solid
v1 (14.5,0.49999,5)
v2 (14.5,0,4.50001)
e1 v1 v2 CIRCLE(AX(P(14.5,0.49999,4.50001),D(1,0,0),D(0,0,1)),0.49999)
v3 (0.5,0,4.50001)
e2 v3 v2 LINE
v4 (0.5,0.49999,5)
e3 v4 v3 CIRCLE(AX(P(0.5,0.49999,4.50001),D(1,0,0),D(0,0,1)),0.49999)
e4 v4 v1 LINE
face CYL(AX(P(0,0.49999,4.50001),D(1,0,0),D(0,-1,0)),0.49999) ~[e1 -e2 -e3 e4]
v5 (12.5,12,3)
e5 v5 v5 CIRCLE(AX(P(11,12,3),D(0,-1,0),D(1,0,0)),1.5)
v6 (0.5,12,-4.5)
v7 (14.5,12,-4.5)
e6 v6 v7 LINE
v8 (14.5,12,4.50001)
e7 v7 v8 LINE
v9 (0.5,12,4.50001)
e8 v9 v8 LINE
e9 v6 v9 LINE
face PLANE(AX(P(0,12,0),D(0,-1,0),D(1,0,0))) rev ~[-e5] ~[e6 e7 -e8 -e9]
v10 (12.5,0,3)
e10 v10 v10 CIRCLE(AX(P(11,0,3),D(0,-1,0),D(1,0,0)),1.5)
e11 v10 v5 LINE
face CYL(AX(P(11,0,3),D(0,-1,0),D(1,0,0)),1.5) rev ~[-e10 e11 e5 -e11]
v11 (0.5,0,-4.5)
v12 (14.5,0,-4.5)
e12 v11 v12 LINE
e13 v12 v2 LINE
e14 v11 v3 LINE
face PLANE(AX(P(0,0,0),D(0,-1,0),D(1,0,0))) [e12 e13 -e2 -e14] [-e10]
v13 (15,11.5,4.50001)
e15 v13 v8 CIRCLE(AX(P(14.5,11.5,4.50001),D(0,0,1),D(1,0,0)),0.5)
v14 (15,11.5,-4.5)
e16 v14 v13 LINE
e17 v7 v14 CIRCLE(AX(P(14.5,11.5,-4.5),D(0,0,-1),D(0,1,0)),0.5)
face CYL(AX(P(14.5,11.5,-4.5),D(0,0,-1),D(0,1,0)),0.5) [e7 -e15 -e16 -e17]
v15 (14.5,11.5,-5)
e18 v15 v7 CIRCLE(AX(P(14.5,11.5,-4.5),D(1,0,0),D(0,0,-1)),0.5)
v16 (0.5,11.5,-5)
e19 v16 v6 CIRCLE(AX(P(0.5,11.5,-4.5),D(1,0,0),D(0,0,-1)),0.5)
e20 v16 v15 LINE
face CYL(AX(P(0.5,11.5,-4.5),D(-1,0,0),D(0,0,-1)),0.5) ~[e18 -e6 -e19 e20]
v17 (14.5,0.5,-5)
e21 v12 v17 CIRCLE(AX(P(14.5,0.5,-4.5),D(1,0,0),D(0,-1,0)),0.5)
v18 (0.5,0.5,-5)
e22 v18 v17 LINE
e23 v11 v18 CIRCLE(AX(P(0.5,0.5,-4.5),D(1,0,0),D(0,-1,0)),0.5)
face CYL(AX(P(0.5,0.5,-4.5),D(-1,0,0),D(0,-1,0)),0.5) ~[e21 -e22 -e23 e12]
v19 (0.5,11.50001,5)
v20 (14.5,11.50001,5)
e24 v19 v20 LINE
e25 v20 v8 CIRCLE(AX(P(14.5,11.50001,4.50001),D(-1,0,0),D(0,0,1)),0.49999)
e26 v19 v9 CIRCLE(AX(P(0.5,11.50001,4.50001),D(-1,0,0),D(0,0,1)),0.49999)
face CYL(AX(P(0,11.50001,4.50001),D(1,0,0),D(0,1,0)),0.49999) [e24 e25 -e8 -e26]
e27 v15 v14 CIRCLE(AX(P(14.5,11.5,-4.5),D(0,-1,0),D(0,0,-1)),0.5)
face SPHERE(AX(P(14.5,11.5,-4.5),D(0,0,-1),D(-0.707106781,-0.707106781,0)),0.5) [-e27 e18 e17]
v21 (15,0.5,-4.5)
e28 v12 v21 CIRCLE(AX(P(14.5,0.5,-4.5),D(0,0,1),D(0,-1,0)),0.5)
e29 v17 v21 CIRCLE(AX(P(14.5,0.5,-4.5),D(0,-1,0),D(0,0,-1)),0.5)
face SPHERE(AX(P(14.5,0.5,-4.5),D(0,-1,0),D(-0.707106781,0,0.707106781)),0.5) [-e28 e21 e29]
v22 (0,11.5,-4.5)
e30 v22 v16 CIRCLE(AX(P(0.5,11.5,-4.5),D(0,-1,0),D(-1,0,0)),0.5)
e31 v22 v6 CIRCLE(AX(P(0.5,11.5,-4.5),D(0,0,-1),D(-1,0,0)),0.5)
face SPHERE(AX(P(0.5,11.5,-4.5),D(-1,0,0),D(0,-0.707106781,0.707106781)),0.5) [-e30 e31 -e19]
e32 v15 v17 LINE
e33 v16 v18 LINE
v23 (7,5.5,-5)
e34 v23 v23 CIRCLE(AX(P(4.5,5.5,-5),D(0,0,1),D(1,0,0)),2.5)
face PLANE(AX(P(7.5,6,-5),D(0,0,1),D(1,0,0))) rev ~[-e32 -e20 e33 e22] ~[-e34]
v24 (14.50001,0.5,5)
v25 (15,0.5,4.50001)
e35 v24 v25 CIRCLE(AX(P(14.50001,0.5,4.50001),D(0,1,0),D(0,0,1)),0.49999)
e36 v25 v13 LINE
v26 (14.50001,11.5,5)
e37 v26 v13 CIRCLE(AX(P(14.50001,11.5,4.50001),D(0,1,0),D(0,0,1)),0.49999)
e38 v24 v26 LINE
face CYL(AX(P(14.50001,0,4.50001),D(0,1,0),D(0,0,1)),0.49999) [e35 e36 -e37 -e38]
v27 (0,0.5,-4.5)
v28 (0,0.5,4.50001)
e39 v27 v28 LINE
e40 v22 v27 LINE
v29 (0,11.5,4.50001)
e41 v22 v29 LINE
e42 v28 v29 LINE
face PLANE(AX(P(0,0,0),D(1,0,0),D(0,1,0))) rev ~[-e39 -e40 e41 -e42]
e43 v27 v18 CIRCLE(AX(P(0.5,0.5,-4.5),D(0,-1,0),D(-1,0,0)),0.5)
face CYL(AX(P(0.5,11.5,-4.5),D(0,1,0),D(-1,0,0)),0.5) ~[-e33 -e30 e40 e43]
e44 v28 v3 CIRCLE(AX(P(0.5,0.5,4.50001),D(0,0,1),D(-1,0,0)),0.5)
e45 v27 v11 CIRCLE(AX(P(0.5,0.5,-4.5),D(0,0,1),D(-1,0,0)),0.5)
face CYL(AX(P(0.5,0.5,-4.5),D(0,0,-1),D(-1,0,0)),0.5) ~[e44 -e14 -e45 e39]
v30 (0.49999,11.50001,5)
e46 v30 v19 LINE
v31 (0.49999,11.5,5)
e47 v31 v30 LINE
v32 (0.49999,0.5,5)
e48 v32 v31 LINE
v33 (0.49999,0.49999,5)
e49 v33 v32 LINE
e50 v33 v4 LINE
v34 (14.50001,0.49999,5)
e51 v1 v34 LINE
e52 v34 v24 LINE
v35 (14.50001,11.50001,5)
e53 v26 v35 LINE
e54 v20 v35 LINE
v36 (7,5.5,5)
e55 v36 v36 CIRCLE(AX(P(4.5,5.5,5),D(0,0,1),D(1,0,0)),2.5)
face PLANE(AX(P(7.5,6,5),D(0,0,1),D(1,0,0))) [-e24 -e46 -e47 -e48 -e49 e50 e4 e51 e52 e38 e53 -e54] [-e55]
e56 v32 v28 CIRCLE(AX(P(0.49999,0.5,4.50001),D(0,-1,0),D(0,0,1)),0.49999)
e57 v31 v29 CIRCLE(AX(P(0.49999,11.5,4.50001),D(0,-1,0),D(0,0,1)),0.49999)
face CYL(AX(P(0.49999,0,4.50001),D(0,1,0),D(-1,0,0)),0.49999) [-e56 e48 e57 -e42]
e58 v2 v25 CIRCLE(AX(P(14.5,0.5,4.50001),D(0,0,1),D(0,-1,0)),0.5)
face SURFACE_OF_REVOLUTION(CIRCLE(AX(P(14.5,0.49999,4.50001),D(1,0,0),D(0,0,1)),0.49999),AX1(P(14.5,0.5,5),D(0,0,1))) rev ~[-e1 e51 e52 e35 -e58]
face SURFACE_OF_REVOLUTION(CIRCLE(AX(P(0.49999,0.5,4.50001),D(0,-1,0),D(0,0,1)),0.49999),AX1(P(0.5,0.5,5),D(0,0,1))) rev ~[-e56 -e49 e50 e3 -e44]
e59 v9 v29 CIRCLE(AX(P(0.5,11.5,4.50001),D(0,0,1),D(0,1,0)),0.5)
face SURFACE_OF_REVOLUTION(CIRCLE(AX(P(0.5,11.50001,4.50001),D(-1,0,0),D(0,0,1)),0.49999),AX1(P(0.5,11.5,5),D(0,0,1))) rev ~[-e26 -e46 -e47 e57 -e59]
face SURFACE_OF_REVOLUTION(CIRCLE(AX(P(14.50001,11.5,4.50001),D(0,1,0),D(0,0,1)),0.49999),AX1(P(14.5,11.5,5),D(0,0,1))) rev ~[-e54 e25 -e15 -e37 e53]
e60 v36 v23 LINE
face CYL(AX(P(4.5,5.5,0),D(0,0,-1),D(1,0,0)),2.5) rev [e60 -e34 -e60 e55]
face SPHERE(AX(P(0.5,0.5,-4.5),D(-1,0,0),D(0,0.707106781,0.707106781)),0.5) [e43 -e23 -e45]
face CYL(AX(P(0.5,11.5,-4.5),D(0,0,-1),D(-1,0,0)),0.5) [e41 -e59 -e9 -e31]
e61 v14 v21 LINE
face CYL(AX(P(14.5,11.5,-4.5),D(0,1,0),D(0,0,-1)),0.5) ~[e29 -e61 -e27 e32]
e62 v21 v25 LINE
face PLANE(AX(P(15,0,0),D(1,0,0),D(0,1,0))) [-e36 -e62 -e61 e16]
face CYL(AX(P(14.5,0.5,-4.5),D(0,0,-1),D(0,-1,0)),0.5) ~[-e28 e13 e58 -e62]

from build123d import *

# Parameters (mm, degrees)
F0_W         = 15
F0_H         = 12
F0_R         = 2.5
F1_DEPTH     = 5
F2_R         = 1.5
F3_DEPTH     = 12.001
F4_R         = 0.49999
F5_T1_DEPTH  = 9.5
F5_T3_DEPTH  = 11
F5_T5_DEPTH  = 14
F5_T8_ANGLE  = 90
F5_T10_ANGLE = 90
F5_T12_ANGLE = 90
F5_T14_ANGLE = 90
F5_S17_W     = 0.5
F5_S17_H     = 0.5
F5_T18_DEPTH = 0.5
F5_S23_W     = 0.5
F5_S23_H     = 0.5
F5_T24_DEPTH = 0.5
F5_S29_W     = 0.5
F5_S29_H     = 0.5
F5_T30_DEPTH = 0.5
F5_S35_W     = 0.5
F5_S35_H     = 0.5
F5_T36_DEPTH = 0.5


# Not quite as in the source:
# - a fillet or chamfer that OpenCascade refuses, or shapes differently, is made with other operations: its cross-section is extruded or revolved along the edge and cut away or added
# - a fillet or chamfer is up to 0.001 mm smaller than in the source, because OpenCascade refuses the exact size


with BuildPart() as f1:
    # F0 (on Top) → F1 (new body, symmetric)
    with BuildSketch(Plane.XY):
        with Locations((7.5, 6)):
            Rectangle(F0_W, F0_H)
        with Locations((4.5, 5.5)):
            Circle(F0_R, mode=Mode.SUBTRACT)
    extrude(amount=F1_DEPTH, both=True)

    # F2 (on face) → F3 (cut, through all)
    with BuildSketch(Plane.XZ):
        with Locations((11, 3)):
            Circle(F2_R)
    extrude(amount=-F3_DEPTH, mode=Mode.SUBTRACT)

    # F4 (radius 0.5 in the source; OpenCascade refuses exactly that, so slightly less here)
    f4_edges = [f1.edges().sort_by_distance(p)[0] for p in [
        (7.5, 0, 5),
        (15, 6, 5),
        (7.5, 12, 5),
        (0, 6, 5),
    ]]
    fillet(f4_edges, radius=F4_R)

    # F5: fillet of radius 0.5 on 8 edges, made by hand

    # F5_s2 → F5_t1 (cut)
    with BuildSketch(Plane.XY.offset(-4.5)):
        with BuildLine():
            ThreePointArc((14.5, 0), (14.8535533906, 0.1464466094), (15, 0.5))
            Line((15, 0.5), (15, 0))
            Line((15, 0), (14.5, 0))
        make_face()
        with BuildLine():
            ThreePointArc((0, 0.5), (0.1464466094, 0.1464466094), (0.5, 0))
            Line((0.5, 0), (0, 0))
            Line((0, 0), (0, 0.5))
        make_face()
        with BuildLine():
            ThreePointArc((0, 11.5), (0.1464466094, 11.8535533906), (0.5, 12))
            Line((0.5, 12), (0, 12))
            Line((0, 12), (0, 11.5))
        make_face()
        with BuildLine():
            ThreePointArc((14.5, 12), (14.8535533906, 11.8535533906), (15, 11.5))
            Line((15, 11.5), (15, 12))
            Line((15, 12), (14.5, 12))
        make_face()
    extrude(amount=F5_T1_DEPTH, mode=Mode.SUBTRACT)

    # F5_s4 → F5_t3 (cut)
    with BuildSketch(Plane.XZ.offset(-11.5)):
        with BuildLine():
            ThreePointArc((0, -4.5), (0.1464466094, -4.8535533906), (0.5, -5))
            Line((0.5, -5), (0, -5))
            Line((0, -5), (0, -4.5))
        make_face()
        with BuildLine():
            ThreePointArc((14.5, -5), (14.8535533906, -4.8535533906), (15, -4.5))
            Line((15, -4.5), (15, -5))
            Line((15, -5), (14.5, -5))
        make_face()
    extrude(amount=F5_T3_DEPTH, mode=Mode.SUBTRACT)

    # F5_s6 → F5_t5 (cut)
    with BuildSketch(Plane.YZ.offset(0.5)):
        with BuildLine():
            ThreePointArc((11.5, -5), (11.8535533906, -4.8535533906), (12, -4.5))
            Line((12, -4.5), (12, -5))
            Line((12, -5), (11.5, -5))
        make_face()
        with BuildLine():
            ThreePointArc((0, -4.5), (0.1464466094, -4.8535533906), (0.5, -5))
            Line((0.5, -5), (0, -5))
            Line((0, -5), (0, -4.5))
        make_face()
    extrude(amount=F5_T5_DEPTH, mode=Mode.SUBTRACT)

    # F5_s7 → F5_t8 (revolve, cut)
    with BuildSketch(Plane.XZ.offset(-11.5)):
        with BuildLine():
            ThreePointArc((14.50001, 5), (14.8535563195, 4.8535563195), (15, 4.50001))
            Line((15, 4.50001), (15, 5))
            Line((15, 5), (14.50001, 5))
        make_face()
    revolve(axis=Axis((14.5, 11.5, 5), (0, 0, 1)), revolution_arc=F5_T8_ANGLE, mode=Mode.SUBTRACT)

    # F5_s9 → F5_t10 (revolve, cut)
    with BuildSketch(Plane.YZ.offset(0.5)):
        with BuildLine():
            ThreePointArc((11.50001, 5), (11.8535563195, 4.8535563195), (12, 4.50001))
            Line((12, 4.50001), (12, 5))
            Line((12, 5), (11.50001, 5))
        make_face()
    revolve(axis=Axis((0.5, 11.5, 5), (0, 0, 1)), revolution_arc=F5_T10_ANGLE, mode=Mode.SUBTRACT)

    # F5_s11 → F5_t12 (revolve, cut)
    with BuildSketch(Plane.XZ.offset(-0.5)):
        with BuildLine():
            ThreePointArc((0.49999, 5), (0.1464436805, 4.8535563195), (0, 4.50001))
            Line((0, 4.50001), (0, 5))
            Line((0, 5), (0.49999, 5))
        make_face()
    revolve(axis=Axis((0.5, 0.5, 5), (0, 0, 1)), revolution_arc=F5_T12_ANGLE, mode=Mode.SUBTRACT)

    # F5_s13 → F5_t14 (revolve, cut)
    with BuildSketch(Plane.YZ.offset(14.5)):
        with BuildLine():
            ThreePointArc((0.49999, 5), (0.1464436805, 4.8535563195), (0, 4.50001))
            Line((0, 4.50001), (0, 5))
            Line((0, 5), (0.49999, 5))
        make_face()
    revolve(axis=Axis((14.5, 0.5, 5), (0, 0, 1)), revolution_arc=F5_T14_ANGLE, mode=Mode.SUBTRACT)


with BuildPart() as f5_tool16:
    # F5_s17 → F5_t18 (new body)
    with BuildSketch(Plane.XZ.offset(-0.5)):
        with Locations((14.75, -4.75)):
            Rectangle(F5_S17_W, F5_S17_H)
    extrude(amount=F5_T18_DEPTH)

    # F5_s19 → F5_t20 (revolve, cut)
    with BuildSketch(Plane(origin=(14.5, 0.5, -4.5), x_dir=(-0.7071067812, 0, 0.7071067812), z_dir=(0.7071067812, 0, 0.7071067812))):
        with BuildLine():
            ThreePointArc((0, -0.5), (0.5, 0), (0, 0.5))
            Line((0, 0.5), (0, -0.5))
        make_face()
    revolve(axis=Axis((14.5, 0.5, -4.5), (0, -1, 0)), mode=Mode.SUBTRACT)


with BuildPart() as f1_1:
    add(f1.part)

    # F5_t15: cut F5_tool16
    add(f5_tool16.part, mode=Mode.SUBTRACT)


with BuildPart() as f5_tool22:
    # F5_s23 → F5_t24 (new body)
    with BuildSketch(Plane.YZ.offset(0.5)):
        with Locations((0.25, -4.75)):
            Rectangle(F5_S23_W, F5_S23_H)
    extrude(amount=-F5_T24_DEPTH)

    # F5_s25 → F5_t26 (revolve, cut)
    with BuildSketch(Plane(origin=(0.5, 0.5, -4.5), x_dir=(0, 0.7071067812, 0.7071067812), z_dir=(0, -0.7071067812, 0.7071067812))):
        with BuildLine():
            ThreePointArc((0, -0.5), (0.5, 0), (0, 0.5))
            Line((0, 0.5), (0, -0.5))
        make_face()
    revolve(axis=Axis((0.5, 0.5, -4.5), (-1, 0, 0)), mode=Mode.SUBTRACT)


with BuildPart() as f1_2:
    add(f1_1.part)

    # F5_t21: cut F5_tool22
    add(f5_tool22.part, mode=Mode.SUBTRACT)


with BuildPart() as f5_tool28:
    # F5_s29 → F5_t30 (new body)
    with BuildSketch(Plane.YZ.offset(0.5)):
        with Locations((11.75, -4.75)):
            Rectangle(F5_S29_W, F5_S29_H)
    extrude(amount=-F5_T30_DEPTH)

    # F5_s31 → F5_t32 (revolve, cut)
    with BuildSketch(Plane(origin=(0.5, 11.5, -4.5), x_dir=(0, -0.7071067812, 0.7071067812), z_dir=(0, -0.7071067812, -0.7071067812))):
        with BuildLine():
            ThreePointArc((0, -0.5), (0.5, 0), (0, 0.5))
            Line((0, 0.5), (0, -0.5))
        make_face()
    revolve(axis=Axis((0.5, 11.5, -4.5), (-1, 0, 0)), mode=Mode.SUBTRACT)


with BuildPart() as f1_3:
    add(f1_2.part)

    # F5_t27: cut F5_tool28
    add(f5_tool28.part, mode=Mode.SUBTRACT)


with BuildPart() as f5_tool34:
    # F5_s35 → F5_t36 (new body)
    with BuildSketch(Plane.XY.offset(-4.5)):
        with Locations((14.75, 11.75)):
            Rectangle(F5_S35_W, F5_S35_H)
    extrude(amount=-F5_T36_DEPTH)

    # F5_s37 → F5_t38 (revolve, cut)
    with BuildSketch(Plane(origin=(14.5, 11.5, -4.5), x_dir=(-0.7071067812, -0.7071067812, 0), z_dir=(0.7071067812, -0.7071067812, 0))):
        with BuildLine():
            ThreePointArc((0, -0.5), (0.5, 0), (0, 0.5))
            Line((0, 0.5), (0, -0.5))
        make_face()
    revolve(axis=Axis((14.5, 11.5, -4.5), (0, 0, -1)), mode=Mode.SUBTRACT)


with BuildPart() as f1_4:
    add(f1_3.part)

    # F5_t33: cut F5_tool34
    add(f5_tool34.part, mode=Mode.SUBTRACT)


solid = f1_4.part
